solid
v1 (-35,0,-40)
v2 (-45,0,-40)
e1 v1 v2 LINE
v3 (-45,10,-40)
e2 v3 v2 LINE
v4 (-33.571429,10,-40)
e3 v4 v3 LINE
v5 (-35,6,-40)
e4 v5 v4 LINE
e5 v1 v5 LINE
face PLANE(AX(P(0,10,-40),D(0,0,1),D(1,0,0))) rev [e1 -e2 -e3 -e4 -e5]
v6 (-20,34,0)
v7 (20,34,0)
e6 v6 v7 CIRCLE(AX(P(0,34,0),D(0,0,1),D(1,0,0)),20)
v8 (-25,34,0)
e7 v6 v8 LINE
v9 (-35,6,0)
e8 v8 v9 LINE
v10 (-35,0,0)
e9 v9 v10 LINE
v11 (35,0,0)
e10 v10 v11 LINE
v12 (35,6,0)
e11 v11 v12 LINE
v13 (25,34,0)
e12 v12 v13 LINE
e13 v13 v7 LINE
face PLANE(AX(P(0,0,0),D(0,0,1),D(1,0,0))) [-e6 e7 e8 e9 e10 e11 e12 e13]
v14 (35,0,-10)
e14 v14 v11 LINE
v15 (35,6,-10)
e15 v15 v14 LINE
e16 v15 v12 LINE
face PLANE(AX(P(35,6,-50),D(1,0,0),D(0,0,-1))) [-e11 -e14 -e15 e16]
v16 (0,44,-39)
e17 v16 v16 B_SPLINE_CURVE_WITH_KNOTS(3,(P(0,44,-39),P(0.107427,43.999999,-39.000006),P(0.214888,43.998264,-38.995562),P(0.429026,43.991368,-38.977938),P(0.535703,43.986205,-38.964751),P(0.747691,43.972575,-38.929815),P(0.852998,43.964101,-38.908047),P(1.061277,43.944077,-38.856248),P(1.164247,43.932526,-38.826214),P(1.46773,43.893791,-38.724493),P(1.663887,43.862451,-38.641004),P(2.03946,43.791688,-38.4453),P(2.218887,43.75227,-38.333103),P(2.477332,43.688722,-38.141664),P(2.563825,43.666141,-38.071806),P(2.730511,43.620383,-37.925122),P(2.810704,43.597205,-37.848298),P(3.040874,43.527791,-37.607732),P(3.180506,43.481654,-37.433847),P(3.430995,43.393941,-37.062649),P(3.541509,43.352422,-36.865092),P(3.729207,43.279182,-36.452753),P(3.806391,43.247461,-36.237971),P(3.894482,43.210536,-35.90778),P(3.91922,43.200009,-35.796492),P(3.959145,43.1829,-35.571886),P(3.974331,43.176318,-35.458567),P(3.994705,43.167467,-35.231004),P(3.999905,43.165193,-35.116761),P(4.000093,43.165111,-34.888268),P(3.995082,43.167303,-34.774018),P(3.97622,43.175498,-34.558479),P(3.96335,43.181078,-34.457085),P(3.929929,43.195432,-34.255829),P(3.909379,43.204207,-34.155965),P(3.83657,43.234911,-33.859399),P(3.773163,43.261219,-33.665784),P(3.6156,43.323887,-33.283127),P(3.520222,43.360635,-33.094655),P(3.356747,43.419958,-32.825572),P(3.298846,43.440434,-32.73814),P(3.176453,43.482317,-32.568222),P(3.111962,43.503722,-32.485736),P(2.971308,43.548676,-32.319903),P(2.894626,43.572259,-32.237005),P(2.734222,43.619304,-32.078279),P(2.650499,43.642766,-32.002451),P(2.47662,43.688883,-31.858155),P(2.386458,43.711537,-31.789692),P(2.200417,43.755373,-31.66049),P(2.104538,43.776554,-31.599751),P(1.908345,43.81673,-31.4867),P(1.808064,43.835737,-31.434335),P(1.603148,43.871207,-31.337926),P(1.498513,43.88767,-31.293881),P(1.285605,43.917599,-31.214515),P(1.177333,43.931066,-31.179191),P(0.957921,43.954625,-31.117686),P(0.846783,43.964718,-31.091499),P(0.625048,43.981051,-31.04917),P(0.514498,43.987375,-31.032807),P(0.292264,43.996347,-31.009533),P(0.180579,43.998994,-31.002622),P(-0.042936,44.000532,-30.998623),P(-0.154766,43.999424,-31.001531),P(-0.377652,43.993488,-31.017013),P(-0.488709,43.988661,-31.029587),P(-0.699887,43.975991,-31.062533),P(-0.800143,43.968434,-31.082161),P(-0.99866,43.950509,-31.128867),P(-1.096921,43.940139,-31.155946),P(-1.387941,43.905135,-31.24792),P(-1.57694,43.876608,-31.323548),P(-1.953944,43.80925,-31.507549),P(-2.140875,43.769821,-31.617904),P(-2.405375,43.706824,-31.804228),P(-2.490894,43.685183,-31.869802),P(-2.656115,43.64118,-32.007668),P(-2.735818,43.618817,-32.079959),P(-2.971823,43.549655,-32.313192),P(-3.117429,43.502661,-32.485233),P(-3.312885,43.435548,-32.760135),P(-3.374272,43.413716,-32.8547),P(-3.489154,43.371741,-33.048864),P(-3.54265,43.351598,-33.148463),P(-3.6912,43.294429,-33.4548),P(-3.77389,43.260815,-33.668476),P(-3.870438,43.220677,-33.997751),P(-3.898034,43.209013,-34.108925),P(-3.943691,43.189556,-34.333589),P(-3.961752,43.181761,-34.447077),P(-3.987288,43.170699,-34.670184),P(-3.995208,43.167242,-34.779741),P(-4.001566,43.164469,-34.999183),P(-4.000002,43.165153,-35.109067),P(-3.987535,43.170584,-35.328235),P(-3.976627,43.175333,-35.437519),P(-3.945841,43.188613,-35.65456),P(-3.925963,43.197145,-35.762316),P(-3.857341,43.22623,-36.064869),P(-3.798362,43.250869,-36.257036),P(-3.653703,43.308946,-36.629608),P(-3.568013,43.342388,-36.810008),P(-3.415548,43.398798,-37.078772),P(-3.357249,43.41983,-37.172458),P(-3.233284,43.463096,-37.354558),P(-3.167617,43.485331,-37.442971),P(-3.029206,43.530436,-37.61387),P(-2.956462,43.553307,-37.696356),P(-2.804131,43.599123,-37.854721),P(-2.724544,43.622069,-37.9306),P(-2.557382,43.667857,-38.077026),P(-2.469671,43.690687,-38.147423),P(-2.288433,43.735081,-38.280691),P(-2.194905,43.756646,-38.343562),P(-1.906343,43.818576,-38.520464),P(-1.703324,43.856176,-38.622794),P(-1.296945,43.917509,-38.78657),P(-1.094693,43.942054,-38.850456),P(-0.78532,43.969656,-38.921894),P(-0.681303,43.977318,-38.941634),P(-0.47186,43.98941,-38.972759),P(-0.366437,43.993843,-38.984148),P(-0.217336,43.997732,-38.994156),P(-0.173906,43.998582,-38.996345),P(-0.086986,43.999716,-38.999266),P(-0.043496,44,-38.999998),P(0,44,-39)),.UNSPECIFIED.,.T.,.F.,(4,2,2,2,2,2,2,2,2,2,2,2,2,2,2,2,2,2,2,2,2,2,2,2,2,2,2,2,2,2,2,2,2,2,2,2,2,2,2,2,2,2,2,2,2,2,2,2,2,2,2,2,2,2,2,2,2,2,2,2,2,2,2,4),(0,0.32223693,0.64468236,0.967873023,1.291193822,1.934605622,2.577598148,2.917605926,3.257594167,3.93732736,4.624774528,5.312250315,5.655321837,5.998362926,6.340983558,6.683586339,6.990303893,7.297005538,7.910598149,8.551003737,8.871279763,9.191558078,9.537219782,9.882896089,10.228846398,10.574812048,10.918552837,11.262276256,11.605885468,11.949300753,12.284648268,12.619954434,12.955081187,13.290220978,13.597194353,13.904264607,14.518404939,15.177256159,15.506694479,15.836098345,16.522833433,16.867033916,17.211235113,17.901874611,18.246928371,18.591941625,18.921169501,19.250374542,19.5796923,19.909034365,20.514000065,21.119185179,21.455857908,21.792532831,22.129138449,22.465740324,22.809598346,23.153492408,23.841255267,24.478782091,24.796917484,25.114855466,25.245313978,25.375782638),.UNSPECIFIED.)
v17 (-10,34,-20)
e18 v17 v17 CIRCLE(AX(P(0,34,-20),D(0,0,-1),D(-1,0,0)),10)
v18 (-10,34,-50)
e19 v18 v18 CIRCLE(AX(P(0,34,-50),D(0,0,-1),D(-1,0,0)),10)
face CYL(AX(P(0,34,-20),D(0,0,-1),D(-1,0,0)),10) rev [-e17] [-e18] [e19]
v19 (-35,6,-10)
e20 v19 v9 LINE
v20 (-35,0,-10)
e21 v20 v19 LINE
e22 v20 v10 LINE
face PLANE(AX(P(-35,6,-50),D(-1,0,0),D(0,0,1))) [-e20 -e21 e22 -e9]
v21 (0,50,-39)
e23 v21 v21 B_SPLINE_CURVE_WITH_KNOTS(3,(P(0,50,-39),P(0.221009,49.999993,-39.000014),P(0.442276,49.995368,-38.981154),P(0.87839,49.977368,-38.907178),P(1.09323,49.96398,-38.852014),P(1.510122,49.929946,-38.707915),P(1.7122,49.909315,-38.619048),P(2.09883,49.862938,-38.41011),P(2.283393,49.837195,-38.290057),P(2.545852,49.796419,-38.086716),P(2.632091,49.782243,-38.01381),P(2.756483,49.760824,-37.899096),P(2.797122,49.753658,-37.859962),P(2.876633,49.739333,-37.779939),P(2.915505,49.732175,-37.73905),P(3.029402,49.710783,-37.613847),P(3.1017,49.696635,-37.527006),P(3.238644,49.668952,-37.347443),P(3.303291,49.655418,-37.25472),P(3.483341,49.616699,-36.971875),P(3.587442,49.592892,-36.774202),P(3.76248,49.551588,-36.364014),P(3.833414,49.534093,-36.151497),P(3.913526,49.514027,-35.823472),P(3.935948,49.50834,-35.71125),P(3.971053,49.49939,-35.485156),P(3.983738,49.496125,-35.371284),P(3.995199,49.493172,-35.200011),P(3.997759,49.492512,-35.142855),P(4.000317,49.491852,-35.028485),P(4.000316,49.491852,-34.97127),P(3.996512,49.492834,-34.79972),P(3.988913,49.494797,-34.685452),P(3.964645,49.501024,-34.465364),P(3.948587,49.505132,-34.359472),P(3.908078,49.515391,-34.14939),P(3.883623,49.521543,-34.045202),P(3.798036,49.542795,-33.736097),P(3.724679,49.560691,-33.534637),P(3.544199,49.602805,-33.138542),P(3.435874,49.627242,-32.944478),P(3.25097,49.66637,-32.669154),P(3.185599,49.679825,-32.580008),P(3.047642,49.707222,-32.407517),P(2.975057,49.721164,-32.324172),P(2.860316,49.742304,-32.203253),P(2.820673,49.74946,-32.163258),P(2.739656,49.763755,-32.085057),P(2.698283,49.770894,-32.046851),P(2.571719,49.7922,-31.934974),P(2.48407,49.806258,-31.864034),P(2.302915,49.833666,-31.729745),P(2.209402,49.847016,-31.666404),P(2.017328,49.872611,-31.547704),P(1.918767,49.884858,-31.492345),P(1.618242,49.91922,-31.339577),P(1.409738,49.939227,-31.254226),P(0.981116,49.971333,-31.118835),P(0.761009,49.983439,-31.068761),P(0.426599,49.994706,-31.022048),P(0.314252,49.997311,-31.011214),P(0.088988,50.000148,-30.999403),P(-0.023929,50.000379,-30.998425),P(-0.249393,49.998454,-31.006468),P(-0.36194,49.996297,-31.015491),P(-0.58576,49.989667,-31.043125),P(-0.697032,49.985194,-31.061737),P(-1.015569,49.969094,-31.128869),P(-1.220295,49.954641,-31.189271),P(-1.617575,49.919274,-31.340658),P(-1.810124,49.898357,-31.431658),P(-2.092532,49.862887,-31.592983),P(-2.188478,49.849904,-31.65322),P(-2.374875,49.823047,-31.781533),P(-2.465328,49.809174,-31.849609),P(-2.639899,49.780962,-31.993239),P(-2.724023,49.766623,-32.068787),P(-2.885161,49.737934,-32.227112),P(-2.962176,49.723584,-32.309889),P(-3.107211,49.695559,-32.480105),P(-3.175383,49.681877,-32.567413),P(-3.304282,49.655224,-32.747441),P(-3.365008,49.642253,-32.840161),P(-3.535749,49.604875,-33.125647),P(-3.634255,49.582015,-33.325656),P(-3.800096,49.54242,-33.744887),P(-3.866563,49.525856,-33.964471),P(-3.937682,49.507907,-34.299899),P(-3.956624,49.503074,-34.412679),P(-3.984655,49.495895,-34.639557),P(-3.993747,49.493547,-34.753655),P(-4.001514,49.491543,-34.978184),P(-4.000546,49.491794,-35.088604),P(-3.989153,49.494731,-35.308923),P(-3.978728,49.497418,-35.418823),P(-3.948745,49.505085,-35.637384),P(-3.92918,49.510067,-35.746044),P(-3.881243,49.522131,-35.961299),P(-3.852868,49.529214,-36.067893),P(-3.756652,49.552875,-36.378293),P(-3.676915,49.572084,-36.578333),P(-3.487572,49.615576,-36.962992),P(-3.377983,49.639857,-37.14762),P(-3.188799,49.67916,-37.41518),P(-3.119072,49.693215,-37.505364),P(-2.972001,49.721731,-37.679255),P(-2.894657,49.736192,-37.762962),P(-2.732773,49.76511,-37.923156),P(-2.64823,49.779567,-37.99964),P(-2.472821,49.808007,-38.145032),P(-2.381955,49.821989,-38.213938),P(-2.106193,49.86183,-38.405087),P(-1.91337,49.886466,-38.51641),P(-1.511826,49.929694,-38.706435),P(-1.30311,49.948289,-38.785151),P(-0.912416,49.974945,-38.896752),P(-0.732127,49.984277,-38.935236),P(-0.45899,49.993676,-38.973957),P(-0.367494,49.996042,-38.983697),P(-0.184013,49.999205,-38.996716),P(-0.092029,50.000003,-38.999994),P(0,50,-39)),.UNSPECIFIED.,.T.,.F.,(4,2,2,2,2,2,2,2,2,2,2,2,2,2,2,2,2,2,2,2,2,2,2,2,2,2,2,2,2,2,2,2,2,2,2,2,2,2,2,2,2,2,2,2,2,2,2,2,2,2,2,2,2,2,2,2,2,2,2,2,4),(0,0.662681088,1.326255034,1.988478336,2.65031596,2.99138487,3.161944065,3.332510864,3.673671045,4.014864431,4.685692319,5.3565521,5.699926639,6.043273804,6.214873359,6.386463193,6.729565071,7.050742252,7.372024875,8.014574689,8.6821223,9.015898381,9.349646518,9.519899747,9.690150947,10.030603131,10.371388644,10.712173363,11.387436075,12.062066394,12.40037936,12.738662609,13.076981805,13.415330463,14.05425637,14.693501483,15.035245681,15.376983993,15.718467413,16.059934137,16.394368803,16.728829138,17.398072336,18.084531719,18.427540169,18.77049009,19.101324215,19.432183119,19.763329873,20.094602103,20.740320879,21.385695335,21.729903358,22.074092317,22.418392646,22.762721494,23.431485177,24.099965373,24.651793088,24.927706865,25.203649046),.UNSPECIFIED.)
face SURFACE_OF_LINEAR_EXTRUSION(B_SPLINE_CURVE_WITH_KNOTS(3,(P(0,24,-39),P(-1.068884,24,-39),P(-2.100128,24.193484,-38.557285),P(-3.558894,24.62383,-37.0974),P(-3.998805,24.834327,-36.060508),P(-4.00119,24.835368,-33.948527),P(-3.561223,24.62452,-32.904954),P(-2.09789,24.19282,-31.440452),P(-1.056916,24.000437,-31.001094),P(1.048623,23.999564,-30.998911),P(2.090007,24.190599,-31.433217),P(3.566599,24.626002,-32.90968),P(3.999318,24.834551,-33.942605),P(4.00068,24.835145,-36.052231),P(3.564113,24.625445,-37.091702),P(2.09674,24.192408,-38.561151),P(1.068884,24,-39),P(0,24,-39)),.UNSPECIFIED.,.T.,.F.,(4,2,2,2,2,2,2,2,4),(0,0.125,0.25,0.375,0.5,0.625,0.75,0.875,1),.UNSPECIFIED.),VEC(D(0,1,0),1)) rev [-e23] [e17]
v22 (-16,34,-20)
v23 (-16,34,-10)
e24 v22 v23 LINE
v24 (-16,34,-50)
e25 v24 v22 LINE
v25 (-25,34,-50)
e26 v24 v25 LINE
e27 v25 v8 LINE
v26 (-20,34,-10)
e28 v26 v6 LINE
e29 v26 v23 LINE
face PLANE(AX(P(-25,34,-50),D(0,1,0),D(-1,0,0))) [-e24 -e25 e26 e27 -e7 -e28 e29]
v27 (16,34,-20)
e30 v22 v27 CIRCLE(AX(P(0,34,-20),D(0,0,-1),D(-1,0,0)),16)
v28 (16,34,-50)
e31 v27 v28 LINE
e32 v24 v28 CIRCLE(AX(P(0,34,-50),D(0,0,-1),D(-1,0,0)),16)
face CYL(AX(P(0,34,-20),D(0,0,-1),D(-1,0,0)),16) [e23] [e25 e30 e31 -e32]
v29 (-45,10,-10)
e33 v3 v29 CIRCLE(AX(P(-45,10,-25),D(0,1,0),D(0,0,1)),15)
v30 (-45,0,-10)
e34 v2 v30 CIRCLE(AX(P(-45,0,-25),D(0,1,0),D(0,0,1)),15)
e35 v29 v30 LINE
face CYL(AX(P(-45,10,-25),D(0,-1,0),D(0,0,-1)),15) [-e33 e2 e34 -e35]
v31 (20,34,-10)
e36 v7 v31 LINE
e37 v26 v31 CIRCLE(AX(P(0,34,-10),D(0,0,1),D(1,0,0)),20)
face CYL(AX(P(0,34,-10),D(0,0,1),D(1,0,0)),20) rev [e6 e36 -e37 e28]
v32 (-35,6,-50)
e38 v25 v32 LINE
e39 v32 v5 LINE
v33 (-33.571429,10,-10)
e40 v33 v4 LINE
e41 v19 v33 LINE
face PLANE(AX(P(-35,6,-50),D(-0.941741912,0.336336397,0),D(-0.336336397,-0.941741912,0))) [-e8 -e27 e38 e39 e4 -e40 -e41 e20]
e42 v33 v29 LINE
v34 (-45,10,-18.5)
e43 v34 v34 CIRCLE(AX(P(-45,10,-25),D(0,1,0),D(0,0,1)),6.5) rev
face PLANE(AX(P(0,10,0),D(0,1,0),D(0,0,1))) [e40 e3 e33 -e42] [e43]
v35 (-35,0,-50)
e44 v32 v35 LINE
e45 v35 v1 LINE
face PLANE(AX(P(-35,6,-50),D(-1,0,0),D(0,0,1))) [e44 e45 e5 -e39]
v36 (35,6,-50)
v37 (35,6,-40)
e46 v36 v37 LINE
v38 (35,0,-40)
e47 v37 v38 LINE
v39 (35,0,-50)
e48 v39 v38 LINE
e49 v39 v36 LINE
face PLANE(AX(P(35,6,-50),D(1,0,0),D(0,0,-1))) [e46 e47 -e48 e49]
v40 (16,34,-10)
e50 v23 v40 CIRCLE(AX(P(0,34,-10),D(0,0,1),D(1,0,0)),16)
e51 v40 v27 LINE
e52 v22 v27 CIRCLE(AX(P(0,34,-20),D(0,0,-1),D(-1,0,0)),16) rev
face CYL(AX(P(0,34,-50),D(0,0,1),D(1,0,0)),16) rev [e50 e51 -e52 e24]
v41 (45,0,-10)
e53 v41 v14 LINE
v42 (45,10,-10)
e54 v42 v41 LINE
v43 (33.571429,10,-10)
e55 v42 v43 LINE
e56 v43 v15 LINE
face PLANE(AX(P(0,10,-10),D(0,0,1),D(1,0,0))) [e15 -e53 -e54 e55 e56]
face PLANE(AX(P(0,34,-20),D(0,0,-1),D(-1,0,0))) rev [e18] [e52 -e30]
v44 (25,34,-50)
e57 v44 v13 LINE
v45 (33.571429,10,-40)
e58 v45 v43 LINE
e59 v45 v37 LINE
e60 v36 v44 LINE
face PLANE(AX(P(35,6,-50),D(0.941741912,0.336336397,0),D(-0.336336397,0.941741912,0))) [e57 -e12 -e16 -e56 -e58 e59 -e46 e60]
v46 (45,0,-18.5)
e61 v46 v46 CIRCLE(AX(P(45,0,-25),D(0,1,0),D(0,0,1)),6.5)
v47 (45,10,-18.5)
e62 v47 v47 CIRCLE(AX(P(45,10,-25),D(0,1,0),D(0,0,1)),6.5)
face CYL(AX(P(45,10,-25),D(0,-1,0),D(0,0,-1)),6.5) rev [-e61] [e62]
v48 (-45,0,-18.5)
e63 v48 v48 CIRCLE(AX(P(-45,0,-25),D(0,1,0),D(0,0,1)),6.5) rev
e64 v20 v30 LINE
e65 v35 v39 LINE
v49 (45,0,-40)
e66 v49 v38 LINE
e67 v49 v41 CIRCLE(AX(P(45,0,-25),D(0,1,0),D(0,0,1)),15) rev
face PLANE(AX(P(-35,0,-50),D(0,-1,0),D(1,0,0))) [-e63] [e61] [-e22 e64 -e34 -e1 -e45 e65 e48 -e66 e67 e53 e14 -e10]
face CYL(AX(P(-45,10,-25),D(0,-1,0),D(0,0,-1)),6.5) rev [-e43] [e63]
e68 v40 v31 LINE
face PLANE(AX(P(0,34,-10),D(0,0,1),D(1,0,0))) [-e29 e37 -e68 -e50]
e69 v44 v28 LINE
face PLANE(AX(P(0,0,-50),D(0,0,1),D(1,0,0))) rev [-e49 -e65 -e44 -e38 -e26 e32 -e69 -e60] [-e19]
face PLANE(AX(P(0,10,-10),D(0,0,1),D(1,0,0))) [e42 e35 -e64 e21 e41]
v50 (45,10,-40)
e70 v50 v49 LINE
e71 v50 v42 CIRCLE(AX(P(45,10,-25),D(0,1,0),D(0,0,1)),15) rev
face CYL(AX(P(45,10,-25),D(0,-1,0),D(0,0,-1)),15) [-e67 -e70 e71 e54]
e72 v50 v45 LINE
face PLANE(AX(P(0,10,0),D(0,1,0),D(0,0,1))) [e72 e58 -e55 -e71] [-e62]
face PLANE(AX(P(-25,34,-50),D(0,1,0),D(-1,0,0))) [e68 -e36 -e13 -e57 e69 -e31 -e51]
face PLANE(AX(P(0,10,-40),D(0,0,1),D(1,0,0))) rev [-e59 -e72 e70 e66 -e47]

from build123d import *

# Parameters (mm, degrees)
EXTRUDE_1_DEPTH     = 50
SKETCH_3_R          = 20
SKETCH_3_R_2        = 16
CUT_EXTRUDE_1_DEPTH = 10
CUT_EXTRUDE_2_DEPTH = 70.864153899
EXTRUDE_START       = -30
SKETCH_4_R          = 16
SKETCH_4_R_2        = 10
EXTRUDE_2_DEPTH     = 30
CUT_EXTRUDE_START   = 43.165151137
CUT_EXTRUDE_3_DEPTH = 6.834848863
SKETCH_6_R          = 6.5
EXTRUDE_3_DEPTH     = 10


# Read off the part's stored shape, not the designer's step: 切除-拉伸3
with BuildPart() as part:
    # 草图1 → 凸台-拉伸1 (new body)
    with BuildSketch(Plane.XY):
        Polygon((-35, 6), (-25, 34), (25, 34), (35, 6), (35, 0), (-35, 0), align=None)
    extrude(amount=-EXTRUDE_1_DEPTH)

    # 草图3 → 切除-拉伸1 (cut)
    with BuildSketch(Plane.XY):
        with Locations((0, 34)):
            Circle(SKETCH_3_R)
        with Locations((0, 34)):
            Circle(SKETCH_3_R_2, mode=Mode.SUBTRACT)
    extrude(amount=-CUT_EXTRUDE_1_DEPTH, mode=Mode.SUBTRACT)

    # 草图3<2> → 切除-拉伸2 (cut, through all)
    with BuildSketch(Plane.XY):
        with BuildLine():
            Line((-16, 34), (16, 34))
            ThreePointArc((16, 34), (0, 50), (-16, 34))
        make_face()
        with BuildLine():
            ThreePointArc((-16, 34), (0, 18), (16, 34))
            Line((16, 34), (-16, 34))
        make_face()
    extrude(amount=-CUT_EXTRUDE_2_DEPTH, mode=Mode.SUBTRACT)

    # 草图4 → 凸台-拉伸2 (add)
    with BuildSketch(Plane(origin=(0, 0, -50), x_dir=(-1, 0, 0), z_dir=(0, 0, -1)).offset(EXTRUDE_START)):
        with Locations((0, 34)):
            Circle(SKETCH_4_R)
        with Locations((0, 34)):
            Circle(SKETCH_4_R_2, mode=Mode.SUBTRACT)
    extrude(amount=EXTRUDE_2_DEPTH)

    # 切除-拉伸3 outline → 切除-拉伸3 (cut)
    with BuildSketch(Plane(origin=(0, 0, 0), x_dir=(1, 0, 0), z_dir=(0, 1, 0)).offset(CUT_EXTRUDE_START)):
        with BuildLine():
            add(Edge.make_bspline(
                [(3.99999996, 35), (3.999967414, 36.053927104), (3.563514164, 37.092301246), (2.830425635, 37.826427201), (2.096738851, 38.561151707), (1.06888327, 39), (-1.068884266, 39), (-2.100127628, 38.557285469), (-2.829510993, 37.827342841), (-3.558894179, 37.09740029), (-3.998804852, 36.060507963), (-4.001190045, 33.948526829), (-3.561222969, 32.904953883), (-2.829556469, 32.172702671), (-2.097890055, 31.440451664), (-1.056916053, 31.001093572), (1.048622532, 30.998910725), (2.090006878, 31.433217451), (2.82830312, 32.171448876), (3.566599135, 32.909680204), (3.999318272, 33.942605173), (3.999999722, 34.998278644), (3.999999987, 34.999139327), (3.99999996, 35)],
                knots=[0.750101996, 0.750101996, 0.750101996, 0.750101996, 0.875, 0.875, 0.875000116, 1, 1, 1.124999999, 1.124999999, 1.125000021, 1.249999998, 1.249999998, 1.374999984, 1.374999984, 1.375000009, 1.499999969, 1.499999969, 1.624999954, 1.624999954, 1.624999981, 1.749999938, 1.749999938, 1.750101934, 1.750101934, 1.750101934, 1.750101934], degree=3))
        make_face()
    extrude(amount=CUT_EXTRUDE_3_DEPTH, mode=Mode.SUBTRACT)

    # 草图6 → 凸台-拉伸3 (add)
    # profile 1 of 2: a face of its own
    with BuildSketch(Plane(origin=(0, 0, 0), x_dir=(1, 0, 0), z_dir=(0, 1, 0))):
        with BuildLine():
            Line((-35, 40), (-45, 40))
            ThreePointArc((-45, 40), (-60, 25), (-45, 10))
            Line((-45, 10), (-35, 10))
            Line((-35, 10), (35, 10))
            Line((35, 10), (35, 40))
            Line((35, 40), (-35, 40))
        make_face()
        with Locations(Location((-45, 25, 0), (0, 0, 270))):
            Circle(SKETCH_6_R, mode=Mode.SUBTRACT)
    # profile 2 of 2: a face of its own
    with BuildSketch(Plane(origin=(0, 0, 0), x_dir=(1, 0, 0), z_dir=(0, 1, 0))):
        with BuildLine():
            ThreePointArc((45, 40), (60, 25), (45, 10))
            Line((45, 10), (35, 10))
            Line((35, 10), (35, 40))
            Line((35, 40), (45, 40))
        make_face()
        with Locations(Location((45, 25, 0), (0, 0, 270))):
            Circle(SKETCH_6_R, mode=Mode.SUBTRACT)
    extrude(amount=EXTRUDE_3_DEPTH)


solid = part.part
